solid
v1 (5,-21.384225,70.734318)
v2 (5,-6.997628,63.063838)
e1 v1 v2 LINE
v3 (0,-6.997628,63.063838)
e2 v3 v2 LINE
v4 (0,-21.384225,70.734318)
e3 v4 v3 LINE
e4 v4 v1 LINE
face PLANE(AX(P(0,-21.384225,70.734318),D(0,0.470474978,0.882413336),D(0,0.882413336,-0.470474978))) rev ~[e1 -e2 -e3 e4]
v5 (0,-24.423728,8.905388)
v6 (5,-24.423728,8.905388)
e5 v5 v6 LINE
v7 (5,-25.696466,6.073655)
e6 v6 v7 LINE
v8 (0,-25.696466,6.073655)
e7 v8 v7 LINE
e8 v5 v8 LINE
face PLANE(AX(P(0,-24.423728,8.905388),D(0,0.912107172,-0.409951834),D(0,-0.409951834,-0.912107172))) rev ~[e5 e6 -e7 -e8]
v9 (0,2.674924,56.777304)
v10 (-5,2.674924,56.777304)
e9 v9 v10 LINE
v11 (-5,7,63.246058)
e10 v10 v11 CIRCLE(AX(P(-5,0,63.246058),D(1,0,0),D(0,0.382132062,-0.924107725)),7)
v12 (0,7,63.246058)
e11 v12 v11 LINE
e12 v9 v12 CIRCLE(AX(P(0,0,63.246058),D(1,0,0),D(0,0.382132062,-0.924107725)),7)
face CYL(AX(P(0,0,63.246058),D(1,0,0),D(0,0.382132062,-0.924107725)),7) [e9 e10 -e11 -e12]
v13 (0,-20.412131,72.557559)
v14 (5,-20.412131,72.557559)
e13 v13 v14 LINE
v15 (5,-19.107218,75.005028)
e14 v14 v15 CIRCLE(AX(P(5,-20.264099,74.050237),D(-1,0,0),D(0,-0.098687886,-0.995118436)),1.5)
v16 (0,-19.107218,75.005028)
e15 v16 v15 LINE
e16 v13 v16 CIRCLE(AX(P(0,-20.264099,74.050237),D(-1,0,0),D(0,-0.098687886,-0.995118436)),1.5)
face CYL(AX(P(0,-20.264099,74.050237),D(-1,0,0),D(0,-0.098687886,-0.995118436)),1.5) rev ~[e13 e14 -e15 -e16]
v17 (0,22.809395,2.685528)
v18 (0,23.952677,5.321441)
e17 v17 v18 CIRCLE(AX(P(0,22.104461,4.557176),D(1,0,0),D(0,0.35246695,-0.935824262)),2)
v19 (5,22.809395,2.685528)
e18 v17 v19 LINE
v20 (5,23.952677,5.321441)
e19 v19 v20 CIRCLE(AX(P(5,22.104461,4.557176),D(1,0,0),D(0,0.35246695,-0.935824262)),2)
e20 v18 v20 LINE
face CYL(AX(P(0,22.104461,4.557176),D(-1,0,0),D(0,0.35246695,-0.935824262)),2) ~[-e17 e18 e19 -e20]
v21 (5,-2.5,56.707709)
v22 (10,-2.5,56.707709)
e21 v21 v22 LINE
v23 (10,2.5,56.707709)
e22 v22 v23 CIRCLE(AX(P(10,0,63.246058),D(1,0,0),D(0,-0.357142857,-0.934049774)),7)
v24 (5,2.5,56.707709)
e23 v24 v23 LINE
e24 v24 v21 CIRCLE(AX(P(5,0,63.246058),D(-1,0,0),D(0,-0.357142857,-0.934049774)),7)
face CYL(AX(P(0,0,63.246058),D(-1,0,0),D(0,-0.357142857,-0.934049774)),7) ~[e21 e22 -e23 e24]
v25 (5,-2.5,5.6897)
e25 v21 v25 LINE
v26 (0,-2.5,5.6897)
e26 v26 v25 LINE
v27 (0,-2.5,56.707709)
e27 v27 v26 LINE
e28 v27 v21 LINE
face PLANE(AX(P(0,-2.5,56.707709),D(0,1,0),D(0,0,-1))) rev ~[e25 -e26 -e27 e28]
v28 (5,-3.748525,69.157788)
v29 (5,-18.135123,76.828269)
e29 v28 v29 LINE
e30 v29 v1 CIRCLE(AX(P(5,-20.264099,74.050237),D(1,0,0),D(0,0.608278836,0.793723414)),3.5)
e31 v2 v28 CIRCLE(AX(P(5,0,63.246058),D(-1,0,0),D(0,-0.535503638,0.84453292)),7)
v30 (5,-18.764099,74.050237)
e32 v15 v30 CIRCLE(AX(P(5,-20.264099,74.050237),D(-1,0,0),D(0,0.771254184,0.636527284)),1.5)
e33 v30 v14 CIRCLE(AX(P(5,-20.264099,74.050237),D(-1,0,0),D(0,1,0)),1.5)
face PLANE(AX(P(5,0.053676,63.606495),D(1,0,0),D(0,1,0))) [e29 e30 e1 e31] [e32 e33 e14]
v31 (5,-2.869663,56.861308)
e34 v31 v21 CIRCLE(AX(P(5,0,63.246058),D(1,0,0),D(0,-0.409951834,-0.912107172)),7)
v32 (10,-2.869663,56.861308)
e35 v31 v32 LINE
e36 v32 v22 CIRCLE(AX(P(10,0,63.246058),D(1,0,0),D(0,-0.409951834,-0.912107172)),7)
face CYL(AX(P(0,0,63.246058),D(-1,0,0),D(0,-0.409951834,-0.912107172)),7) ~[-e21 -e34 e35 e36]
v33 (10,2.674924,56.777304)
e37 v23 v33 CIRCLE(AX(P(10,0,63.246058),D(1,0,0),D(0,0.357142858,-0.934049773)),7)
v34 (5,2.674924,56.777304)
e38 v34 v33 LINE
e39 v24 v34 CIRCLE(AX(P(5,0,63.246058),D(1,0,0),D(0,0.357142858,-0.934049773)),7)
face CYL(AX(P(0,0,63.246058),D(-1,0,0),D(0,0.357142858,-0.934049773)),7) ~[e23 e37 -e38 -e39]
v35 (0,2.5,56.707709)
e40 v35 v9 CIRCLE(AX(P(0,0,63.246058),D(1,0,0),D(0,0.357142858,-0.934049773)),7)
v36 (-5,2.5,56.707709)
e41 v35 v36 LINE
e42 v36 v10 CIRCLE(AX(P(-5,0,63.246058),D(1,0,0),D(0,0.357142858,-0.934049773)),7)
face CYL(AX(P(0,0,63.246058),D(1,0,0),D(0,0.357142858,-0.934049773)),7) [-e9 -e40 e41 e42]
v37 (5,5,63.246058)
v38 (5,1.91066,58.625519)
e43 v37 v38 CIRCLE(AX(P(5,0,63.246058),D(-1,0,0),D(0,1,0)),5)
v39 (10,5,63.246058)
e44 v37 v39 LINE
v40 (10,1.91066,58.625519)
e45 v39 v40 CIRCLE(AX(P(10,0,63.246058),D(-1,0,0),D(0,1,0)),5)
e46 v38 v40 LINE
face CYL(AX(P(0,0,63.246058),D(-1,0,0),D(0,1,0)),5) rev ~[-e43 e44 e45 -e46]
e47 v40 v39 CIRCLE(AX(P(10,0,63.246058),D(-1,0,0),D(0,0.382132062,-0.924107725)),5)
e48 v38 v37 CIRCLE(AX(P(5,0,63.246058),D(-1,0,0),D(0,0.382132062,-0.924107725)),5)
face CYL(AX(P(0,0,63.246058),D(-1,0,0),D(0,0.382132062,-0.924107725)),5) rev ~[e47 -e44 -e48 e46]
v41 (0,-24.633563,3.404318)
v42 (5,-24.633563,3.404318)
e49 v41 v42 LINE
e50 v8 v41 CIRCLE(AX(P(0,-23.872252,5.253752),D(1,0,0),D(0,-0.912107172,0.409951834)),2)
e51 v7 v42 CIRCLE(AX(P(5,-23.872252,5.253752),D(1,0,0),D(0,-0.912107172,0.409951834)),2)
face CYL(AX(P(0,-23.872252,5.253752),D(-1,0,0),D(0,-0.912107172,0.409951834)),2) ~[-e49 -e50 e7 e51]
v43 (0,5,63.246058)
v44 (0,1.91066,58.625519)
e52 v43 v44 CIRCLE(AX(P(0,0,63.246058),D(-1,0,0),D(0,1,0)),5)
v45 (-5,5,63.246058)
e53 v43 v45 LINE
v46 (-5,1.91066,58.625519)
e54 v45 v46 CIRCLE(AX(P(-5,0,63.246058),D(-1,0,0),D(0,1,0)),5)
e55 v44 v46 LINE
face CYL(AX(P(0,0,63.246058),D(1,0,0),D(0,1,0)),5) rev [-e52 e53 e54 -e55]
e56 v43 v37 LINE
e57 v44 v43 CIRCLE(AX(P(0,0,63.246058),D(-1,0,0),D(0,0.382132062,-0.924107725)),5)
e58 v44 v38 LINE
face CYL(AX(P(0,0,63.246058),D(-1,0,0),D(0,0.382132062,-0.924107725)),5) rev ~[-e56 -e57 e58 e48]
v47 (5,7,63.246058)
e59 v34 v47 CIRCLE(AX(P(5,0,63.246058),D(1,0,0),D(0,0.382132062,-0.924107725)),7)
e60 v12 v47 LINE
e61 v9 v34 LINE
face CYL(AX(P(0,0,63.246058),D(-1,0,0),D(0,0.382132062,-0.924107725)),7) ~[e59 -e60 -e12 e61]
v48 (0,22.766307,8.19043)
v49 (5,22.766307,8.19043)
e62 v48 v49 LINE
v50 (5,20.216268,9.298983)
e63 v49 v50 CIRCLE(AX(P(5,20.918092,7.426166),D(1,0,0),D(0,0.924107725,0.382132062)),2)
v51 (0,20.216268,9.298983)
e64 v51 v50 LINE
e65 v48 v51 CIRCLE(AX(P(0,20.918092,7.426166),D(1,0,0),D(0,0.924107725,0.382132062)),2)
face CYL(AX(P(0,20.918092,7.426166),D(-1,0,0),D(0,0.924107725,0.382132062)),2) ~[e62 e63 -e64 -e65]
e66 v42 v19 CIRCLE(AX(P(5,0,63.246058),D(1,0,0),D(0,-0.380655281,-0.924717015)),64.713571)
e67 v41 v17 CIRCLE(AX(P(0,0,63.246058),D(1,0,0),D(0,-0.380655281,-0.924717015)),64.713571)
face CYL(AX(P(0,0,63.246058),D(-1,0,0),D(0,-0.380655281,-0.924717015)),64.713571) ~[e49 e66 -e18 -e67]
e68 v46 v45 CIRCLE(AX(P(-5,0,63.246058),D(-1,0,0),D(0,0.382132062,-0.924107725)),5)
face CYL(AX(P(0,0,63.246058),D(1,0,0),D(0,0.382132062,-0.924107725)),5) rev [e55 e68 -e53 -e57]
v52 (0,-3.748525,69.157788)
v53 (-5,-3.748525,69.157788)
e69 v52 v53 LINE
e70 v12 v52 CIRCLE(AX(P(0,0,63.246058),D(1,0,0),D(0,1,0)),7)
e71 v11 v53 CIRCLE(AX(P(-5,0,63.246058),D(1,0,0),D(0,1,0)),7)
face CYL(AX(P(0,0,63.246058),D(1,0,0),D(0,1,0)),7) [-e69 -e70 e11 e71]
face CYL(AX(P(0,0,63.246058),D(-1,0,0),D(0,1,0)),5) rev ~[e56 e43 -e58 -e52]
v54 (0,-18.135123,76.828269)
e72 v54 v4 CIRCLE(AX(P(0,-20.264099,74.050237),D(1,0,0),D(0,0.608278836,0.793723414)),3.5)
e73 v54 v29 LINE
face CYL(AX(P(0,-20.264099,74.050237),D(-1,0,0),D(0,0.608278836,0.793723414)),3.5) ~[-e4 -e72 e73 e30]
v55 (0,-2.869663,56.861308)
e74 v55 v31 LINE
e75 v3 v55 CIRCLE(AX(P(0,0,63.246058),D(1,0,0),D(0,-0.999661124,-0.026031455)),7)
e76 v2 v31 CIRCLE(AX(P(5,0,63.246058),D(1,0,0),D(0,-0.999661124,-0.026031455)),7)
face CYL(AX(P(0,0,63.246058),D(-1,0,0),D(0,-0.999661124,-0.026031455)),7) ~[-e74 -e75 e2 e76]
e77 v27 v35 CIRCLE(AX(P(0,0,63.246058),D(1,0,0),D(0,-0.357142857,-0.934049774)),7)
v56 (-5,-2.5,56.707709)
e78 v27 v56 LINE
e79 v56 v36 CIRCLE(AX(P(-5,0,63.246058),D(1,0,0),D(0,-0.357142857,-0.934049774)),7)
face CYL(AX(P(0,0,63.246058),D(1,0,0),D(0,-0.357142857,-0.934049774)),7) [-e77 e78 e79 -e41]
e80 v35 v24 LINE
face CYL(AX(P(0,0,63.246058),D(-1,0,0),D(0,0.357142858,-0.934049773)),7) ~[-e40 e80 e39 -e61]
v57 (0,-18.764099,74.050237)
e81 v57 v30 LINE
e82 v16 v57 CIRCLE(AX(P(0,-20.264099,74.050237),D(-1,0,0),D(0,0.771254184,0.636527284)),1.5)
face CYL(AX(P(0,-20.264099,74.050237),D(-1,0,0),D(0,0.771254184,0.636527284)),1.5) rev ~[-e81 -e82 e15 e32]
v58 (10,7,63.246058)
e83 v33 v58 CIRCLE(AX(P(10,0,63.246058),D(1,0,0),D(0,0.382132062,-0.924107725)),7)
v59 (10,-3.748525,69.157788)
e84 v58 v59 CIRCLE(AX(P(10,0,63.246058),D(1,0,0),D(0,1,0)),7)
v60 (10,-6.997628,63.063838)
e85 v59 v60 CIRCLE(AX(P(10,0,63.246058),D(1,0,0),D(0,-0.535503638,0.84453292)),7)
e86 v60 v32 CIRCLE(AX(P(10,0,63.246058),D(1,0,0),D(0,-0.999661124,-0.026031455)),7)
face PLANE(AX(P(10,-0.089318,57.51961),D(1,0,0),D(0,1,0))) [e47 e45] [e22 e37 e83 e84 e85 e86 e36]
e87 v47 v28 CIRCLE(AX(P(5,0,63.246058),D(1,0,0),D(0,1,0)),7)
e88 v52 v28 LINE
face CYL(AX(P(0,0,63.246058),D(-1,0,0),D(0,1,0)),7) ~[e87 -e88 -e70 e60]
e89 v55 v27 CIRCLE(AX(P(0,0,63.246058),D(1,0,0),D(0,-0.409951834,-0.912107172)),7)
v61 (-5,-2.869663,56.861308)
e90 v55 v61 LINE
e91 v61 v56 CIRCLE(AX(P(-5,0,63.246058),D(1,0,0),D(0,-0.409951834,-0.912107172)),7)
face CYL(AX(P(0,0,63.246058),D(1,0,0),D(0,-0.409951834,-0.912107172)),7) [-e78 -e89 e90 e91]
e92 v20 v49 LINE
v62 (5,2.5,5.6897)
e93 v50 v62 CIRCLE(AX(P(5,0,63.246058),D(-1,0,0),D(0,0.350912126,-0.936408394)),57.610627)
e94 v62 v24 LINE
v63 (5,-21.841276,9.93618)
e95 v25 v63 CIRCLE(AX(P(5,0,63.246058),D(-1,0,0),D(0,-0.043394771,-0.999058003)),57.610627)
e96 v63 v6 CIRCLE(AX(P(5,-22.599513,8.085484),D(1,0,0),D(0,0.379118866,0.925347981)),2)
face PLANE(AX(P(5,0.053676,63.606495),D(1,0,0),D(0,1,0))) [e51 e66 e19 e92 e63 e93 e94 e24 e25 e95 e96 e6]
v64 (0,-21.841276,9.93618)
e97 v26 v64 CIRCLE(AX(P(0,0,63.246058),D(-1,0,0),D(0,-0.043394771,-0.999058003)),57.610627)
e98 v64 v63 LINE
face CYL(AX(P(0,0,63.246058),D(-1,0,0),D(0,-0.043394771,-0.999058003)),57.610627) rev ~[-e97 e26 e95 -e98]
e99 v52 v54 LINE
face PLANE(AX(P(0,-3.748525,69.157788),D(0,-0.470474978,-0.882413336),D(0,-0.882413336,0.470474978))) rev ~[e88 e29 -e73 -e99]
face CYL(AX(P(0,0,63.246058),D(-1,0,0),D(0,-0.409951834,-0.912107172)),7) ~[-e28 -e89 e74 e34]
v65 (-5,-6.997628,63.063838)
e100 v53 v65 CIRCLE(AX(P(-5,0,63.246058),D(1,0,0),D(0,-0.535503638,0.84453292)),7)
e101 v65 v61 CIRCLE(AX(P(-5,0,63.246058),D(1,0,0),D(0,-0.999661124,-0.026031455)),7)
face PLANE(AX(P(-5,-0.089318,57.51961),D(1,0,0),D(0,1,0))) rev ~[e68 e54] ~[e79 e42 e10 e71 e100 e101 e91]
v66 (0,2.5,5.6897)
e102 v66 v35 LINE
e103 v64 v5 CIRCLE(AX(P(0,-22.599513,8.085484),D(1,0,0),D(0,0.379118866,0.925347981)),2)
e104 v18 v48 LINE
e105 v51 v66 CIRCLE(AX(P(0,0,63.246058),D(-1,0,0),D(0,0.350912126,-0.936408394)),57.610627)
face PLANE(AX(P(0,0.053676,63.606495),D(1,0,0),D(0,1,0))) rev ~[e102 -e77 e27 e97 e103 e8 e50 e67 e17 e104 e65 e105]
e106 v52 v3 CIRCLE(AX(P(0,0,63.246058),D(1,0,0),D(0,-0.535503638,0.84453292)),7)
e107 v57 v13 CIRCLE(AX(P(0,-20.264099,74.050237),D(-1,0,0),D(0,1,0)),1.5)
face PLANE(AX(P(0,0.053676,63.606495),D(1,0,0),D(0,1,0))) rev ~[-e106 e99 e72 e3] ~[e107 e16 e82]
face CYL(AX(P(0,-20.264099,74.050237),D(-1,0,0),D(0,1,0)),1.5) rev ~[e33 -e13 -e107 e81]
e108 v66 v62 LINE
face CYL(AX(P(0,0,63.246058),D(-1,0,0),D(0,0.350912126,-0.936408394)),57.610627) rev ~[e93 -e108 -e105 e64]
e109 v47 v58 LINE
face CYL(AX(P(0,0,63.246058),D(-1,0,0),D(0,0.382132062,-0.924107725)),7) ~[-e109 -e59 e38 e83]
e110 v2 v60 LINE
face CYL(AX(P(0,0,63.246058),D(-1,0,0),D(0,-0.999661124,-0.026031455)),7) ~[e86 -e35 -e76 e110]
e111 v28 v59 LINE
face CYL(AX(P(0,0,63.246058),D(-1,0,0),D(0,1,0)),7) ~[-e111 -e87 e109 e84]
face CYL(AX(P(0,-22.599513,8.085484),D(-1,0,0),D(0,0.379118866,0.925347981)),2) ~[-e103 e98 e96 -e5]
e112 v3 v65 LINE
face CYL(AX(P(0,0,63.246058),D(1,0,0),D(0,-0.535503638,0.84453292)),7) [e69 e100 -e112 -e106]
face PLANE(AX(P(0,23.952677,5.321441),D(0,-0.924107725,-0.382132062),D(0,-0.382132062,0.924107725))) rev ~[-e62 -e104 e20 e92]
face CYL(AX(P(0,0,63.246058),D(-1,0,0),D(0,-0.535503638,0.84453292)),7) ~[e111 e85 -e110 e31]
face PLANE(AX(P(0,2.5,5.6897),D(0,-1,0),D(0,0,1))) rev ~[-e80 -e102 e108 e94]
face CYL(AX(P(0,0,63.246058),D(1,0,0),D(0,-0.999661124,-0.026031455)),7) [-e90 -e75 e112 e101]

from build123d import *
from build123d import SkipClean  # not in build123d's __all__

# Parameters (mm, degrees)
F1_DEPTH      = 5
F2_DEPTH      = 10
F2_DEPTH_BACK = 5


with BuildPart() as f1:
    # F0 (on Right) → F1 (new body)
    with BuildSketch(Plane.YZ):
        with BuildLine():
            ThreePointArc((-2.0497591696, 58.6855219415), (-2.7158059717, 67.4442000024), (5, 63.2460578033))
            ThreePointArc((5, 63.2460578033), (4.1565190701, 60.4669663655), (1.9106603122, 58.6255191798))
            Line((1.9106603122, 58.6255191798), (2.6749244371, 56.7773037304))
            ThreePointArc((2.6749244371, 56.7773037304), (5.8191266982, 59.3553297904), (7, 63.2460578033))
            ThreePointArc((7, 63.2460578033), (3.3734494014, 69.3795591799), (-3.7485254675, 69.1577882453))
            ThreePointArc((-3.7485254675, 69.1577882453), (-6.1768933492, 66.539382651), (-6.9976278698, 63.0638376186))
            ThreePointArc((-6.9976278698, 63.0638376186), (-5.827409471, 59.3677464624), (-2.8696628374, 56.8613075968))
            Line((-2.8696628374, 56.8613075968), (-2.0497591696, 58.6855219415))
        make_face()
        with BuildLine():
            ThreePointArc((1.9106603122, 58.6255191798), (-0.0757443456, 58.2466315568), (-2.0497591696, 58.6855219415))
            Line((-2.0497591696, 58.6855219415), (-2.8696628374, 56.8613075968))
            ThreePointArc((-2.8696628374, 56.8613075968), (-2.6859296062, 56.7818654987), (-2.5, 56.707709388))
            Line((-2.5, 56.707709388), (2.5, 56.707709388))
            ThreePointArc((2.5, 56.707709388), (2.5876961907, 56.7419184733), (2.6749244371, 56.7773037304))
            Line((2.6749244371, 56.7773037304), (1.9106603122, 58.6255191798))
        make_face()
        with BuildLine():
            Line((-21.3842253571, 70.7343179555), (-6.9976278698, 63.0638376186))
            ThreePointArc((-6.9976278698, 63.0638376186), (-6.1768933492, 66.539382651), (-3.7485254675, 69.1577882453))
            Line((-3.7485254675, 69.1577882453), (-18.1351229548, 76.8282685822))
            ThreePointArc((-18.1351229548, 76.8282685822), (-17.1255151434, 75.5992014909), (-16.7640988794, 74.0502366327))
            ThreePointArc((-16.7640988794, 74.0502366327), (-18.2233199438, 71.2067842705), (-21.3842253571, 70.7343179555))
        make_face()
        with BuildLine():
            Line((2.5, 56.707709388), (-2.5, 56.707709388))
            ThreePointArc((-2.5, 56.707709388), (0, 56.2460578033), (2.5, 56.707709388))
        make_face()
        with BuildLine():
            ThreePointArc((2.5, 56.707709388), (0, 56.2460578033), (-2.5, 56.707709388))
            Line((-2.5, 56.707709388), (-2.5, 5.6896996604))
            ThreePointArc((-2.5, 5.6896996604), (0, 5.6354306355), (2.5, 5.6896996604))
            Line((2.5, 5.6896996604), (2.5, 56.707709388))
        make_face()
        with BuildLine():
            Line((-20.412130709, 72.5575589791), (-21.3842253571, 70.7343179555))
            ThreePointArc((-21.3842253571, 70.7343179555), (-18.2233199438, 71.2067842705), (-16.7640988794, 74.0502366327))
            ThreePointArc((-16.7640988794, 74.0502366327), (-17.1255151434, 75.5992014909), (-18.1351229548, 76.8282685822))
            Line((-18.1351229548, 76.8282685822), (-19.1072176029, 75.0050275585))
            ThreePointArc((-19.1072176029, 75.0050275585), (-18.8524824452, 74.5575225901), (-18.7640988794, 74.0502366327))
            ThreePointArc((-18.7640988794, 74.0502366327), (-19.2571350629, 72.9384705277), (-20.412130709, 72.5575589791))
        make_face()
        with BuildLine():
            ThreePointArc((-18.1351229548, 76.8282685822), (-23.352545554, 75.6968990565), (-21.3842253571, 70.7343179555))
            Line((-21.3842253571, 70.7343179555), (-20.412130709, 72.5575589791))
            ThreePointArc((-20.412130709, 72.5575589791), (-21.5877188828, 74.7559491), (-19.1072176029, 75.0050275585))
            Line((-19.1072176029, 75.0050275585), (-18.1351229548, 76.8282685822))
        make_face()
        with BuildLine():
            ThreePointArc((2.5, 5.6896996604), (0, 5.6354306355), (-2.5, 5.6896996604))
            ThreePointArc((-2.5, 5.6896996604), (-12.3544556578, 6.9757122555), (-21.8412756578, 9.9361802916))
            ThreePointArc((-21.8412756578, 9.9361802916), (-23.3409375081, 9.9429800309), (-24.4237277351, 8.9053879982))
            Line((-24.4237277351, 8.9053879982), (-25.6964663445, 6.0736552965))
            ThreePointArc((-25.6964663445, 6.0736552965), (-25.7303627866, 4.5138703516), (-24.6335625617, 3.4043175994))
            ThreePointArc((-24.6335625617, 3.4043175994), (-0.9803374174, -1.4600872963), (22.8093950074, 2.6855279633))
            ThreePointArc((22.8093950074, 2.6855279633), (23.939304908, 3.7613447039), (23.9526765567, 5.3214406119))
            Line((23.9526765567, 5.3214406119), (22.7663073553, 8.1904302912))
            ThreePointArc((22.7663073553, 8.1904302912), (21.7154471881, 9.260348424), (20.2162676541, 9.2989829539))
            ThreePointArc((20.2162676541, 9.2989829539), (11.5006058756, 6.7950132854), (2.5, 5.6896996604))
        make_face()
    extrude(amount=F1_DEPTH)

    # F0 (on Right) → F2 (join, two sides)
    with BuildSketch(Plane.YZ) as f2_sk:
        with BuildLine():
            ThreePointArc((1.9106603122, 58.6255191798), (-0.0757443456, 58.2466315568), (-2.0497591696, 58.6855219415))
            Line((-2.0497591696, 58.6855219415), (-2.8696628374, 56.8613075968))
            ThreePointArc((-2.8696628374, 56.8613075968), (-2.6859296062, 56.7818654987), (-2.5, 56.707709388))
            Line((-2.5, 56.707709388), (2.5, 56.707709388))
            ThreePointArc((2.5, 56.707709388), (2.5876961907, 56.7419184733), (2.6749244371, 56.7773037304))
            Line((2.6749244371, 56.7773037304), (1.9106603122, 58.6255191798))
        make_face()
        with BuildLine():
            ThreePointArc((-2.0497591696, 58.6855219415), (-2.7158059717, 67.4442000024), (5, 63.2460578033))
            ThreePointArc((5, 63.2460578033), (4.1565190701, 60.4669663655), (1.9106603122, 58.6255191798))
            Line((1.9106603122, 58.6255191798), (2.6749244371, 56.7773037304))
            ThreePointArc((2.6749244371, 56.7773037304), (5.8191266982, 59.3553297904), (7, 63.2460578033))
            ThreePointArc((7, 63.2460578033), (3.3734494014, 69.3795591799), (-3.7485254675, 69.1577882453))
            ThreePointArc((-3.7485254675, 69.1577882453), (-6.1768933492, 66.539382651), (-6.9976278698, 63.0638376186))
            ThreePointArc((-6.9976278698, 63.0638376186), (-5.827409471, 59.3677464624), (-2.8696628374, 56.8613075968))
            Line((-2.8696628374, 56.8613075968), (-2.0497591696, 58.6855219415))
        make_face()
        with BuildLine():
            Line((2.5, 56.707709388), (-2.5, 56.707709388))
            ThreePointArc((-2.5, 56.707709388), (0, 56.2460578033), (2.5, 56.707709388))
        make_face()
    with SkipClean():  # cleaning this boolean's faces spoils the solid; the shape is the same uncleaned
        extrude(amount=F2_DEPTH)
        extrude(f2_sk.sketch, amount=-F2_DEPTH_BACK)


solid = f1.part
